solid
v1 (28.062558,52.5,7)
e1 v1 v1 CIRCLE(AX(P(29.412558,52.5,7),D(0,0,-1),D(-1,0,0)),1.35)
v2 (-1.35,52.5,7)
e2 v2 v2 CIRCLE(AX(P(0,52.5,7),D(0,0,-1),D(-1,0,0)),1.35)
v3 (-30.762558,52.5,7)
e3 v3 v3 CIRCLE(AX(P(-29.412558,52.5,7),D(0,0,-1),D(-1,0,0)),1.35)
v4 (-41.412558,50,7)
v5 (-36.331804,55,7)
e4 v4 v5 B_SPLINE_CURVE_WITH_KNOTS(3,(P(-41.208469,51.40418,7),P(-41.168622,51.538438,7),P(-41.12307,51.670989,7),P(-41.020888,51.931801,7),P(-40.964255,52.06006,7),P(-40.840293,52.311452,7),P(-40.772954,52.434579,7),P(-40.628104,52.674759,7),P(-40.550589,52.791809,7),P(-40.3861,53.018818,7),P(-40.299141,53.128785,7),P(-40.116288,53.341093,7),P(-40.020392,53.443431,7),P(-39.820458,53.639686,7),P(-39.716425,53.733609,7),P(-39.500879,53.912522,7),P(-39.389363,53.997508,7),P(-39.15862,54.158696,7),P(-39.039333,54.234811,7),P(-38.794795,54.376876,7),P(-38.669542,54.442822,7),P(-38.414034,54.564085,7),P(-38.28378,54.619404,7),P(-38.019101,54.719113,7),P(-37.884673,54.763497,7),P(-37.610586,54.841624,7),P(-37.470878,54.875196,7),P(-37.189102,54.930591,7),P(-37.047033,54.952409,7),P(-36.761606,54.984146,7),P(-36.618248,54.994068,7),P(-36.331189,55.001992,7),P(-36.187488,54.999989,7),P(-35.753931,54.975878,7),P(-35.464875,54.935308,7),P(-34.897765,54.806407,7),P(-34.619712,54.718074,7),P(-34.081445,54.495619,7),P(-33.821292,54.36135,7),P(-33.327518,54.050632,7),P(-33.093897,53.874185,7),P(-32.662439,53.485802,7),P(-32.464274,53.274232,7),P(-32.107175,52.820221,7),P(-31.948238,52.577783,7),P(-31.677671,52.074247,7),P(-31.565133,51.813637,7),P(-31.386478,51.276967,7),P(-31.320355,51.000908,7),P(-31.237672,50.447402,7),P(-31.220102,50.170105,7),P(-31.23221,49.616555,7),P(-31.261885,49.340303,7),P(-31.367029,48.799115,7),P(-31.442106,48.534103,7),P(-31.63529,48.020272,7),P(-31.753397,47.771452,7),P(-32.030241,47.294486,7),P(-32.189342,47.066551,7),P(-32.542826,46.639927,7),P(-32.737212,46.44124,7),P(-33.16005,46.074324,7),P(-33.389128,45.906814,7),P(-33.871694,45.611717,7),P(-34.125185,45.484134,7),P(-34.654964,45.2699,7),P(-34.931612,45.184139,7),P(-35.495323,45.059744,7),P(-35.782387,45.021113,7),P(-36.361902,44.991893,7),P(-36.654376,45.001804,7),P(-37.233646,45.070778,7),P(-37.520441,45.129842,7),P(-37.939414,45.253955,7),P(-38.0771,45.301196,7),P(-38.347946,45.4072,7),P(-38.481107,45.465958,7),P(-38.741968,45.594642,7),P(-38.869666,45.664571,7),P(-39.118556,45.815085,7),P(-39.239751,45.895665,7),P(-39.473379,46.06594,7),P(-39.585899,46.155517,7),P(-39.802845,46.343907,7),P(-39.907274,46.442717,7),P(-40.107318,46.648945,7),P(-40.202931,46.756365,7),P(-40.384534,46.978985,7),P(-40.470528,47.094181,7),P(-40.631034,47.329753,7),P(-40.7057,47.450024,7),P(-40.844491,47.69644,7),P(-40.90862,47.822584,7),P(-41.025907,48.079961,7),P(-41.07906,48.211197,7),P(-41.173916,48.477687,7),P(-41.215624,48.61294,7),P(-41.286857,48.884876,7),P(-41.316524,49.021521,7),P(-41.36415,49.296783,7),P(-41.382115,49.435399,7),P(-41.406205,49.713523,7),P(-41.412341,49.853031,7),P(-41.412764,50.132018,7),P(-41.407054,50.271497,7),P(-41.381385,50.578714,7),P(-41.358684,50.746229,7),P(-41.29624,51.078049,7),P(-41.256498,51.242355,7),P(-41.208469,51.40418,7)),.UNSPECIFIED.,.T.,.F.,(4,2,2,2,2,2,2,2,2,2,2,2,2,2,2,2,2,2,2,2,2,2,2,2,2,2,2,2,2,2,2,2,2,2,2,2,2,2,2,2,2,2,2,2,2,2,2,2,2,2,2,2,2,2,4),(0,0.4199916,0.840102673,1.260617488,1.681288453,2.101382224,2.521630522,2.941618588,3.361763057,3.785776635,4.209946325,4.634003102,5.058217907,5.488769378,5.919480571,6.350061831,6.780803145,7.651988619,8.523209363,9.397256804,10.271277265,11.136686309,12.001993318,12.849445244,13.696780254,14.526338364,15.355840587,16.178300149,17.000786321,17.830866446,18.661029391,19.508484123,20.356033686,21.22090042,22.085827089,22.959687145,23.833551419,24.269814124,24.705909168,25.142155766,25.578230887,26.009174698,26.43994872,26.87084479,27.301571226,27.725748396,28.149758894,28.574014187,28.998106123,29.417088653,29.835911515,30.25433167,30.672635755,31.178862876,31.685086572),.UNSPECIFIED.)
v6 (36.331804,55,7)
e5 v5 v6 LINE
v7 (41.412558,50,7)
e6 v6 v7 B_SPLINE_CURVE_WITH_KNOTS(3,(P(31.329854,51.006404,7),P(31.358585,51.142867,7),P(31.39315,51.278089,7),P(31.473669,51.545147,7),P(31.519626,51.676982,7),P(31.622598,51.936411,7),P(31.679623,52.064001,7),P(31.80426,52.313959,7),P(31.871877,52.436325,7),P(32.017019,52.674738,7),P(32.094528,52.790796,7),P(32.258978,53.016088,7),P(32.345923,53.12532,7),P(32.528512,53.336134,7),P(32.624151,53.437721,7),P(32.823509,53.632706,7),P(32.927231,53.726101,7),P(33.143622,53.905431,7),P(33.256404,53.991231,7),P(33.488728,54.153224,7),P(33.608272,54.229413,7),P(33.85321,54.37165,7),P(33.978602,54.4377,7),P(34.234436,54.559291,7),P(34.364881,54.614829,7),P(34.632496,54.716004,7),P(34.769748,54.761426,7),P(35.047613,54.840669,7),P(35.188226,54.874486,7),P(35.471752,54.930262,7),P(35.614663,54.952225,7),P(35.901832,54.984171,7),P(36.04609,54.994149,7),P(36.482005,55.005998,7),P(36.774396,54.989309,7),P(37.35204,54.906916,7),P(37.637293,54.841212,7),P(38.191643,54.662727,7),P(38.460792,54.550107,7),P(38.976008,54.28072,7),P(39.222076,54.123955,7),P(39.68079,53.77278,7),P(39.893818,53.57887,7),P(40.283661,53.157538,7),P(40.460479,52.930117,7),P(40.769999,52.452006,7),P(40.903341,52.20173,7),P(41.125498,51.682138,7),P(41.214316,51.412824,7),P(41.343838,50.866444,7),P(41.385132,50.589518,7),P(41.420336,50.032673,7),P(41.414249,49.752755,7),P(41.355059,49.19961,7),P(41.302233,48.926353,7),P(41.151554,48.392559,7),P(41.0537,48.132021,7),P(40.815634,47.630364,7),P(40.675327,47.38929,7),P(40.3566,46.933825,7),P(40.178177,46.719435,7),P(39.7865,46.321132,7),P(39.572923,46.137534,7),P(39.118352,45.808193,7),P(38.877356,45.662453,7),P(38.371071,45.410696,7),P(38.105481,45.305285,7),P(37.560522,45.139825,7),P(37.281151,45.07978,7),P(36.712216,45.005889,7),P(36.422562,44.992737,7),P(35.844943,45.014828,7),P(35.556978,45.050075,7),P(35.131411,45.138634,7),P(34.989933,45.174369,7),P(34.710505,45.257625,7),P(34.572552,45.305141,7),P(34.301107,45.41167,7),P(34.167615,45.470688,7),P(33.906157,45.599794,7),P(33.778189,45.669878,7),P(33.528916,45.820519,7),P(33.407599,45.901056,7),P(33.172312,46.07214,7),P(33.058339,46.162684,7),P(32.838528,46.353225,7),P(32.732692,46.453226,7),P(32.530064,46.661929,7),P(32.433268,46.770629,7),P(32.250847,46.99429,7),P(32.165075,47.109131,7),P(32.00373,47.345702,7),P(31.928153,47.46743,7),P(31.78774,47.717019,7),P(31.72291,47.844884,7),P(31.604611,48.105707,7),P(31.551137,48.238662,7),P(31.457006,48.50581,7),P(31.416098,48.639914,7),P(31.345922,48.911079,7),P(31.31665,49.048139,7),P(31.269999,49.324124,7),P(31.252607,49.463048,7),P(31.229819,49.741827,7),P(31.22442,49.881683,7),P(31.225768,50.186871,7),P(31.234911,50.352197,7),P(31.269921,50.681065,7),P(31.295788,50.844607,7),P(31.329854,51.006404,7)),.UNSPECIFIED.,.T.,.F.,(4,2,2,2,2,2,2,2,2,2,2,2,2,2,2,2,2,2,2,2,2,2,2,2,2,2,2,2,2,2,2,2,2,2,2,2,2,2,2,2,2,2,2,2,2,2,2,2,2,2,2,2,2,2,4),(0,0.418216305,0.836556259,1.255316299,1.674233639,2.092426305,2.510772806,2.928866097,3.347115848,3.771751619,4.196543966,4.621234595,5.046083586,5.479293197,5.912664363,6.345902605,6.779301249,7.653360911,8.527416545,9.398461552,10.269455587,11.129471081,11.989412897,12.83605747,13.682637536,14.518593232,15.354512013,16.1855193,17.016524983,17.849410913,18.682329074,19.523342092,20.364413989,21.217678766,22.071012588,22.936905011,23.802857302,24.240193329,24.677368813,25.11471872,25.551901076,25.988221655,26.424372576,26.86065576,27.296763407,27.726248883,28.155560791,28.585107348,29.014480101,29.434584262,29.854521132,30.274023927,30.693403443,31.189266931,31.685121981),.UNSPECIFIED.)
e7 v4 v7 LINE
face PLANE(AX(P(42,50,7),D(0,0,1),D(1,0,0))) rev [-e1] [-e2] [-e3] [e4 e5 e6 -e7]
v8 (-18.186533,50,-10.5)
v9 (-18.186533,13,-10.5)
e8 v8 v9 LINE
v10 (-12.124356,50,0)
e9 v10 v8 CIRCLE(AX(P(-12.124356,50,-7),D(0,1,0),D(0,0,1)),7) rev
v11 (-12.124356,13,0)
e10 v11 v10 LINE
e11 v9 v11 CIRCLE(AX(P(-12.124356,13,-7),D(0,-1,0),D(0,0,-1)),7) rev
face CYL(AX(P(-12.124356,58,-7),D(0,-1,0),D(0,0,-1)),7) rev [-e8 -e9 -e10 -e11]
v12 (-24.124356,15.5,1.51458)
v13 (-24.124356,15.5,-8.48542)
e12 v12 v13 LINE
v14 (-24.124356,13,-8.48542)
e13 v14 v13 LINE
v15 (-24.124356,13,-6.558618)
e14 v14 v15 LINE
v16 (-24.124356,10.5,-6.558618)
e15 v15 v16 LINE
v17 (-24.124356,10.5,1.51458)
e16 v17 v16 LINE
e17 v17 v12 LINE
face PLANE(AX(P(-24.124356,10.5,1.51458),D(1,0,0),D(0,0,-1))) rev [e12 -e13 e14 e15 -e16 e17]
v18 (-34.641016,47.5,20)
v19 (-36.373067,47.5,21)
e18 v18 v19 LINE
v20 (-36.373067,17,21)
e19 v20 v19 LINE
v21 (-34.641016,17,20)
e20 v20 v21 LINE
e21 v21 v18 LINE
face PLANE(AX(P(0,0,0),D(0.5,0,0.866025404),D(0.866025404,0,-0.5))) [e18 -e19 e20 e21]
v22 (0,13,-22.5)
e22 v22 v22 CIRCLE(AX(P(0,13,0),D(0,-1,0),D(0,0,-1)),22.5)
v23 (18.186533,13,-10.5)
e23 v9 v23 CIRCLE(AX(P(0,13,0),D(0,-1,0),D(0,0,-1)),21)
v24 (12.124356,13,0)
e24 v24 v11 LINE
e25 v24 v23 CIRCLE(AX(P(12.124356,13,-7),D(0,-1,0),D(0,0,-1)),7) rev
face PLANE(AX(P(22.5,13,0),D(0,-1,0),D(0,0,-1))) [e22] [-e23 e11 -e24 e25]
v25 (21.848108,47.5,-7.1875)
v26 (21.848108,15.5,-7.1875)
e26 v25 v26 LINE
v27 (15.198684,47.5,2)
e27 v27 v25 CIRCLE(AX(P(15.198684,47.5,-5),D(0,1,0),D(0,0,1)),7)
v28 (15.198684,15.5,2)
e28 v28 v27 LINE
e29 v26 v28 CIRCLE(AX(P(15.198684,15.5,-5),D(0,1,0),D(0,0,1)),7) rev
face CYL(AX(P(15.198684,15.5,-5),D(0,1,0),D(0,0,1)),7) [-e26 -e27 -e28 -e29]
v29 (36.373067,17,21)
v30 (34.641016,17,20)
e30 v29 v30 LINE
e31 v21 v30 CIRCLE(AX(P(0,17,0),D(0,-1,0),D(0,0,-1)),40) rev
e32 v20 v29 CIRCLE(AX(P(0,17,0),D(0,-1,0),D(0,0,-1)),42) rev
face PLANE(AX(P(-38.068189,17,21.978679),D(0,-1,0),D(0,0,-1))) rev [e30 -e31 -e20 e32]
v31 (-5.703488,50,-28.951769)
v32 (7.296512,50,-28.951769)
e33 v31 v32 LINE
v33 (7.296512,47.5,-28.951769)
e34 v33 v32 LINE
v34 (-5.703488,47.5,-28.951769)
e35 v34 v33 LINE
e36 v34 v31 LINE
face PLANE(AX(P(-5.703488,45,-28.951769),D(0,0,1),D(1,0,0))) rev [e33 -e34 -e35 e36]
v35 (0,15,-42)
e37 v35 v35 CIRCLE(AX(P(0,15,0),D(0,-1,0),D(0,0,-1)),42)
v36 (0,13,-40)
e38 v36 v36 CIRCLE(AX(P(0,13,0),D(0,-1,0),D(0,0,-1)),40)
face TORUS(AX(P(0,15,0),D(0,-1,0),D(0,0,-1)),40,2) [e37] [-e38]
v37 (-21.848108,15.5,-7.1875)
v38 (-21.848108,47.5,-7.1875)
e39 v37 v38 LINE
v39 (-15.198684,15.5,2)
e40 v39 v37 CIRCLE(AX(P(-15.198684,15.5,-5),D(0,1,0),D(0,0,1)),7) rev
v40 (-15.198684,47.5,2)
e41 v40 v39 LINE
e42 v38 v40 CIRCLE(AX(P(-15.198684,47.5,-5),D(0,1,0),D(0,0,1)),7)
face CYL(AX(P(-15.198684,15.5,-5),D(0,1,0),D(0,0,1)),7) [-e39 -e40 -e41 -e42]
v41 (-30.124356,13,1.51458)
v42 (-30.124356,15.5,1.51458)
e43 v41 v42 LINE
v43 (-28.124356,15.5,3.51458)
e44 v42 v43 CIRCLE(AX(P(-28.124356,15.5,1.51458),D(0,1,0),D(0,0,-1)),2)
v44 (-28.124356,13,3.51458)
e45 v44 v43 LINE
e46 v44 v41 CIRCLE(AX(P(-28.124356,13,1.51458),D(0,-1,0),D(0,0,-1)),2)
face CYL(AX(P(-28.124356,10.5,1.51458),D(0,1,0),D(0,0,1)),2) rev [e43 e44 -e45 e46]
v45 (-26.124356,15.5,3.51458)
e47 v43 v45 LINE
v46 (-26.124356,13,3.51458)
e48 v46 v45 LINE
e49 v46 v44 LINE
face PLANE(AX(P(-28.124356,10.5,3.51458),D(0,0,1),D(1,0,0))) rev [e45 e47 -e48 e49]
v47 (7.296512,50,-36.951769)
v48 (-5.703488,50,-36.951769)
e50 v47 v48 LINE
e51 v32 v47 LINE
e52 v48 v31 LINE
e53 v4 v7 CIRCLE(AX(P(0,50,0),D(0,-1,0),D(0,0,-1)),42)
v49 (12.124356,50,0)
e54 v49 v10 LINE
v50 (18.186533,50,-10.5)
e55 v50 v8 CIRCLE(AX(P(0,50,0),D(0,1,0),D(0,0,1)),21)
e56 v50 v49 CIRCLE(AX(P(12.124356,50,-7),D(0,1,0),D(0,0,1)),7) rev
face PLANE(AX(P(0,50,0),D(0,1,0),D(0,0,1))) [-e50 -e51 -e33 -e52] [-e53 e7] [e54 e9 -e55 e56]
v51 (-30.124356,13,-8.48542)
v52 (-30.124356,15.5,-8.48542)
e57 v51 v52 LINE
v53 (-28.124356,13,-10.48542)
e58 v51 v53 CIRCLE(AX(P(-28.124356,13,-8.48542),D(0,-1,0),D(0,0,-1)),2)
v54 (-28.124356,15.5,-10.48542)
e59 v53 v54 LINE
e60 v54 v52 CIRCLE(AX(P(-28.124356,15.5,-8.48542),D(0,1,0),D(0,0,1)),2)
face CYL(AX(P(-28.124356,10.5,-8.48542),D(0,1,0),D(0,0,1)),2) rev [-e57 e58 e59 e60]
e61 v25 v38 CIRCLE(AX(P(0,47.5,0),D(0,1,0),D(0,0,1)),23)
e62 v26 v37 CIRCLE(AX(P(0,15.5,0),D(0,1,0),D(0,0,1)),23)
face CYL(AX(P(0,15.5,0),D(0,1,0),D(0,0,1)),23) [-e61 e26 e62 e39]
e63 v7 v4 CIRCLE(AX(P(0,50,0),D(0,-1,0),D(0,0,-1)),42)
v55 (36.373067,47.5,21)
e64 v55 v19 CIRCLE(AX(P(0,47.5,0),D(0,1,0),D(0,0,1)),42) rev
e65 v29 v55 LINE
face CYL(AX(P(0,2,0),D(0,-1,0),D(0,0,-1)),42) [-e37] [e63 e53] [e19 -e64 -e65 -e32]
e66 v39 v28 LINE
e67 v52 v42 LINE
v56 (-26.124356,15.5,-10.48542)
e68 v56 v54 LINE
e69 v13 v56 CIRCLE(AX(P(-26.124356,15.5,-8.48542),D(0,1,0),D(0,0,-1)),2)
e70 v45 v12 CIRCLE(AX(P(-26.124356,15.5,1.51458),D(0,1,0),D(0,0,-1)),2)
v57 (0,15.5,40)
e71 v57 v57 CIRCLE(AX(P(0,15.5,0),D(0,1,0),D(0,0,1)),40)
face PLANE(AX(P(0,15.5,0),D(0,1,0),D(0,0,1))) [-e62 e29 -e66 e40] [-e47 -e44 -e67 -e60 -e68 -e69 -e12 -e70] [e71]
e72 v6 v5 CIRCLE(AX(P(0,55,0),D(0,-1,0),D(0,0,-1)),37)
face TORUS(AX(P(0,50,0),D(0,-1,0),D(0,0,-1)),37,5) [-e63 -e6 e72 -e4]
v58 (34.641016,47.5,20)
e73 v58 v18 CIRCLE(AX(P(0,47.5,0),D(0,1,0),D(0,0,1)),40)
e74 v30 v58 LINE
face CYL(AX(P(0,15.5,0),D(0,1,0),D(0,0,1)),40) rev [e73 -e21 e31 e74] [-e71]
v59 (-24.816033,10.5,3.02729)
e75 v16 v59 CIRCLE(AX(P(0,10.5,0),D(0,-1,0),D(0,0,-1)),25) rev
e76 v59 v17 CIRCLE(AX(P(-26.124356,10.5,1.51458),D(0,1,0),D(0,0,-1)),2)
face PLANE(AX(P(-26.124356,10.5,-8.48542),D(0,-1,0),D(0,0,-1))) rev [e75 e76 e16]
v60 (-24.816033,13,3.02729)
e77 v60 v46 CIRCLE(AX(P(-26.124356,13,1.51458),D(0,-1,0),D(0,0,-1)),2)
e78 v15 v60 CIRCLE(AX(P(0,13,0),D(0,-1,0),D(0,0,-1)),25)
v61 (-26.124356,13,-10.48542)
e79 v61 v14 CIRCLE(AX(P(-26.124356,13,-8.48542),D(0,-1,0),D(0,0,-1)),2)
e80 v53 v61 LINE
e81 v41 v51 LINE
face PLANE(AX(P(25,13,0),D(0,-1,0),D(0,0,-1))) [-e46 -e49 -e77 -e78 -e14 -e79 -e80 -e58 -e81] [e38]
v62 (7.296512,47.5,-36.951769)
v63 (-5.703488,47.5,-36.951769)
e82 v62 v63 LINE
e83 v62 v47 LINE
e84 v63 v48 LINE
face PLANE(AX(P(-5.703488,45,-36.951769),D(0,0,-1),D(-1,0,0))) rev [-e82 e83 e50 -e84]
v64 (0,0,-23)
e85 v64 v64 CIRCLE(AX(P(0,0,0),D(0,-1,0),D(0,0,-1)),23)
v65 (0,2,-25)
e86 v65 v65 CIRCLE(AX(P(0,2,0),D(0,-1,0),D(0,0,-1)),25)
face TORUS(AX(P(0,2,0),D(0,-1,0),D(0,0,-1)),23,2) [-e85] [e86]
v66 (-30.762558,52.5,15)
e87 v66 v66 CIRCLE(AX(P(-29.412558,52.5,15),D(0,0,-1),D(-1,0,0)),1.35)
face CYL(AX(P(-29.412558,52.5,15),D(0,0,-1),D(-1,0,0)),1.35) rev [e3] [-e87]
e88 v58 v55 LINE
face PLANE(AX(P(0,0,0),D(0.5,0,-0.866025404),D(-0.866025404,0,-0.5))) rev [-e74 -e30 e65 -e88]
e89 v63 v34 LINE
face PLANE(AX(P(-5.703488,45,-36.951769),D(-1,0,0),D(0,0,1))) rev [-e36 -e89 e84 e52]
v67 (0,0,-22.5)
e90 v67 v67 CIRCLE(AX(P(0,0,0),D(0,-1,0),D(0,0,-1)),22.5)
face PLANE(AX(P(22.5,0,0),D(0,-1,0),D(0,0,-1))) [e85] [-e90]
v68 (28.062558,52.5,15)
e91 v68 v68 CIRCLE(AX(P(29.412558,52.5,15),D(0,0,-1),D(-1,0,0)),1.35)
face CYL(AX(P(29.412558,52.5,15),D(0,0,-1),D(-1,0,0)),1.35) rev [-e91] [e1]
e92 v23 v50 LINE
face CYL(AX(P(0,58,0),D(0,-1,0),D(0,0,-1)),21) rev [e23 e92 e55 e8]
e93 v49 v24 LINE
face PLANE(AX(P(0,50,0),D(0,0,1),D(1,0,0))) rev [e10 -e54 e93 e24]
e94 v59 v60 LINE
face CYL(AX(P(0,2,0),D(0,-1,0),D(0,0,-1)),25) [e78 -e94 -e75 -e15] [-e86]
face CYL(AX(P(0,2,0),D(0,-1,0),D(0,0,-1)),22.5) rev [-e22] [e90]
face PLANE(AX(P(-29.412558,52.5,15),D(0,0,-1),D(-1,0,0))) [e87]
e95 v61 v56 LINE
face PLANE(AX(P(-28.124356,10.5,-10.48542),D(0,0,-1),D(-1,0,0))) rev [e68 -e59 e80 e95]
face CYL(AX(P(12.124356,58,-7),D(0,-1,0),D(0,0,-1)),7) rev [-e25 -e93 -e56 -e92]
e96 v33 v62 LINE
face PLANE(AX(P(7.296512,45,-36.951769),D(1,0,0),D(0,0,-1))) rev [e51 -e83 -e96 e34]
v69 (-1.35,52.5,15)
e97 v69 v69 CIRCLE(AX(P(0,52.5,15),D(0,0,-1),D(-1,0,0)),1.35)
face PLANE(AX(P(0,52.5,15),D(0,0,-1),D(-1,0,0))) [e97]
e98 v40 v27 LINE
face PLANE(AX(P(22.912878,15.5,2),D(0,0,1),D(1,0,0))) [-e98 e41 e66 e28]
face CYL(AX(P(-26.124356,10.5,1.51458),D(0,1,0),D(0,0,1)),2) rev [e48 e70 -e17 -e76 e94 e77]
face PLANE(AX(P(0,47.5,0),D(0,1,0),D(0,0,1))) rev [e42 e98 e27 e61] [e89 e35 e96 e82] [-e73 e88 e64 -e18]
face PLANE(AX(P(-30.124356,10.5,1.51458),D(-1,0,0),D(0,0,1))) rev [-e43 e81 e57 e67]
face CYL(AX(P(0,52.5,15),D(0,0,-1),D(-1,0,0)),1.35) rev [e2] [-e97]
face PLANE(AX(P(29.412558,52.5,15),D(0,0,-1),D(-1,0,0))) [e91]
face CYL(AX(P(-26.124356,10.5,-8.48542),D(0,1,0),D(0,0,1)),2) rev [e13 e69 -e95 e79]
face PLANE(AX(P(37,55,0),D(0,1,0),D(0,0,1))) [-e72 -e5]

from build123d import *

# Parameters (mm, degrees)
CUT_EXTRUDE1_DEPTH  = 5
CUT_EXTRUDE3_DEPTH  = 45
SKETCH8_R           = 40
CUT_EXTRUDE4_DEPTH  = 32
FILLET1_R           = 7
FILLET2_R           = 7
CUT_REVOLVE1_START  = 17
CUT_REVOLVE1_DEPTH  = 30.5
CUT_EXTRUDE12_DEPTH = 5
SKETCH18_W          = 13
SKETCH18_H          = 8
CUT_EXTRUDE13_DEPTH = 5
SKETCH20_W          = 84
SKETCH20_H          = 7
CUT_EXTRUDE15_DEPTH = 5
SKETCH19_R          = 1.35
CUT_EXTRUDE14_DEPTH = 8


# Read off the part's stored shape, not the designer's step: Cut-Revolve1
with BuildPart() as part:
    # Sketch1 → Revolve1 (revolve)
    with BuildSketch(Plane.XY, mode=Mode.PRIVATE) as revolve1_sk:
        with BuildLine():
            Line((22.5, 0), (23, 0))
            ThreePointArc((23, 0), (24.414213562, 0.585786438), (25, 2))
            Line((25, 2), (25, 13))
            Line((25, 13), (40, 13))
            ThreePointArc((40, 13), (41.414213562, 13.585786438), (42, 15))
            Line((42, 15), (42, 50))
            ThreePointArc((42, 50), (40.535533906, 53.535533906), (37, 55))
            Line((37, 55), (0, 55))
            Line((0, 55), (0, 13))
            Line((0, 13), (22.5, 13))
            Line((22.5, 13), (22.5, 0))
        make_face()
    revolve(revolve1_sk.sketch.rotate(Axis((0, 2, 0), (0, 1, 0)), 90), axis=Axis((0, 2, 0), (0, 1, 0)))

    # Sketch5 → Cut-Extrude1 (cut)
    with BuildSketch(Plane(origin=(0, 55, 0), x_dir=(1, 0, 0), z_dir=(0, 1, 0))):
        with BuildLine():
            Line((-42, 0), (-40, 0))
            Line((-40, 0), (40, 0))
            Line((40, 0), (42, 0))
            ThreePointArc((42, 0), (0, 42), (-42, 0))
        make_face()
    extrude(amount=-CUT_EXTRUDE1_DEPTH, mode=Mode.SUBTRACT)

    # Sketch7 → Cut-Extrude3 (cut)
    with BuildSketch(Plane.XZ.offset(-13)):
        with BuildLine():
            Line((-21, 0), (21, 0))
            ThreePointArc((21, 0), (0, -21), (-21, 0))
        make_face()
    extrude(amount=-CUT_EXTRUDE3_DEPTH, mode=Mode.SUBTRACT)

    # Sketch8 → Cut-Extrude4 (cut)
    with BuildSketch(Plane(origin=(0, 47.5, 0), x_dir=(1, 0, 0), z_dir=(0, 1, 0))):
        with Locations(Location((0, 0, 0), (0, 0, 270))):
            Circle(SKETCH8_R)
        with BuildLine():
            Line((22.912878475, -2), (-22.912878475, -2))
            ThreePointArc((-22.912878475, -2), (0, 23), (22.912878475, -2))
        make_face(mode=Mode.SUBTRACT)
    extrude(amount=-CUT_EXTRUDE4_DEPTH, mode=Mode.SUBTRACT)

    # Fillet1
    fillet1_edges = [part.edges().sort_by_distance(p)[0] for p in [
        (21, 31.5, 0),
        (-21, 31.5, 0),
    ]]
    fillet(fillet1_edges, radius=FILLET1_R)

    # Fillet2
    fillet2_edges = [part.edges().sort_by_distance(p)[0] for p in [
        (-22.912878475, 31.5, 2),
        (22.912878475, 31.5, 2),
    ]]
    fillet(fillet2_edges, radius=FILLET2_R)

    # Cut-Revolve1 outline → Cut-Revolve1 (cut)
    with BuildSketch(Plane(origin=(0, 0, 0), x_dir=(1, 0, 0), z_dir=(0, 1, 0)).offset(CUT_REVOLVE1_START)):
        with BuildLine():
            Line((-34.641016151, -20), (-36.373066959, -21))
            ThreePointArc((-36.373066959, -21), (0, -42), (36.373066959, -21))
            Line((36.373066959, -21), (34.641016151, -20))
            ThreePointArc((34.641016151, -20), (0, -40), (-34.641016151, -20))
        make_face()
    extrude(amount=CUT_REVOLVE1_DEPTH, mode=Mode.SUBTRACT)

    # Sketch15 → Cut-Extrude12 (cut)
    with BuildSketch(Plane(origin=(0, 15.5, 0), x_dir=(1, 0, 0), z_dir=(0, 1, 0))):
        with BuildLine():
            Line((-28.124355653, -3.514579578), (-26.124355653, -3.514579578))
            ThreePointArc((-26.124355653, -3.514579578), (-24.710142091, -2.928793141), (-24.124355653, -1.514579578))
            Line((-24.124355653, -1.514579578), (-24.124355653, 8.485420422))
            ThreePointArc((-24.124355653, 8.485420422), (-24.710142091, 9.899633984), (-26.124355653, 10.485420422))
            Line((-26.124355653, 10.485420422), (-28.124355653, 10.485420422))
            ThreePointArc((-28.124355653, 10.485420422), (-29.538569215, 9.899633984), (-30.124355653, 8.485420422))
            Line((-30.124355653, 8.485420422), (-30.124355653, -1.514579578))
            ThreePointArc((-30.124355653, -1.514579578), (-29.538569215, -2.928793141), (-28.124355653, -3.514579578))
        make_face()
    extrude(amount=-CUT_EXTRUDE12_DEPTH, mode=Mode.SUBTRACT)

    # Sketch18 → Cut-Extrude13 (cut)
    with BuildSketch(Plane(origin=(0, 50, 0), x_dir=(1, 0, 0), z_dir=(0, 1, 0))):
        with Locations((0.796512215, 32.951769165)):
            Rectangle(SKETCH18_W, SKETCH18_H)
    extrude(amount=-CUT_EXTRUDE13_DEPTH, mode=Mode.SUBTRACT)

    # Sketch20 → Cut-Extrude15 (cut)
    with BuildSketch(Plane(origin=(0, 55, 0), x_dir=(1, 0, 0), z_dir=(0, 1, 0))):
        with Locations((0, -3.5)):
            Rectangle(SKETCH20_W, SKETCH20_H)
    extrude(amount=-CUT_EXTRUDE15_DEPTH, mode=Mode.SUBTRACT)

    # Sketch19 → Cut-Extrude14 (cut)
    with BuildSketch(Plane(origin=(0, 0, 7), x_dir=(-1, 0, 0), z_dir=(0, 0, -1))):
        with Locations((0, 52.5)):
            Circle(SKETCH19_R)
        with Locations((-29.412558482, 52.5)):
            Circle(SKETCH19_R)
        with Locations((29.412558482, 52.5)):
            Circle(SKETCH19_R)
    extrude(amount=-CUT_EXTRUDE14_DEPTH, mode=Mode.SUBTRACT)


solid = part.part
